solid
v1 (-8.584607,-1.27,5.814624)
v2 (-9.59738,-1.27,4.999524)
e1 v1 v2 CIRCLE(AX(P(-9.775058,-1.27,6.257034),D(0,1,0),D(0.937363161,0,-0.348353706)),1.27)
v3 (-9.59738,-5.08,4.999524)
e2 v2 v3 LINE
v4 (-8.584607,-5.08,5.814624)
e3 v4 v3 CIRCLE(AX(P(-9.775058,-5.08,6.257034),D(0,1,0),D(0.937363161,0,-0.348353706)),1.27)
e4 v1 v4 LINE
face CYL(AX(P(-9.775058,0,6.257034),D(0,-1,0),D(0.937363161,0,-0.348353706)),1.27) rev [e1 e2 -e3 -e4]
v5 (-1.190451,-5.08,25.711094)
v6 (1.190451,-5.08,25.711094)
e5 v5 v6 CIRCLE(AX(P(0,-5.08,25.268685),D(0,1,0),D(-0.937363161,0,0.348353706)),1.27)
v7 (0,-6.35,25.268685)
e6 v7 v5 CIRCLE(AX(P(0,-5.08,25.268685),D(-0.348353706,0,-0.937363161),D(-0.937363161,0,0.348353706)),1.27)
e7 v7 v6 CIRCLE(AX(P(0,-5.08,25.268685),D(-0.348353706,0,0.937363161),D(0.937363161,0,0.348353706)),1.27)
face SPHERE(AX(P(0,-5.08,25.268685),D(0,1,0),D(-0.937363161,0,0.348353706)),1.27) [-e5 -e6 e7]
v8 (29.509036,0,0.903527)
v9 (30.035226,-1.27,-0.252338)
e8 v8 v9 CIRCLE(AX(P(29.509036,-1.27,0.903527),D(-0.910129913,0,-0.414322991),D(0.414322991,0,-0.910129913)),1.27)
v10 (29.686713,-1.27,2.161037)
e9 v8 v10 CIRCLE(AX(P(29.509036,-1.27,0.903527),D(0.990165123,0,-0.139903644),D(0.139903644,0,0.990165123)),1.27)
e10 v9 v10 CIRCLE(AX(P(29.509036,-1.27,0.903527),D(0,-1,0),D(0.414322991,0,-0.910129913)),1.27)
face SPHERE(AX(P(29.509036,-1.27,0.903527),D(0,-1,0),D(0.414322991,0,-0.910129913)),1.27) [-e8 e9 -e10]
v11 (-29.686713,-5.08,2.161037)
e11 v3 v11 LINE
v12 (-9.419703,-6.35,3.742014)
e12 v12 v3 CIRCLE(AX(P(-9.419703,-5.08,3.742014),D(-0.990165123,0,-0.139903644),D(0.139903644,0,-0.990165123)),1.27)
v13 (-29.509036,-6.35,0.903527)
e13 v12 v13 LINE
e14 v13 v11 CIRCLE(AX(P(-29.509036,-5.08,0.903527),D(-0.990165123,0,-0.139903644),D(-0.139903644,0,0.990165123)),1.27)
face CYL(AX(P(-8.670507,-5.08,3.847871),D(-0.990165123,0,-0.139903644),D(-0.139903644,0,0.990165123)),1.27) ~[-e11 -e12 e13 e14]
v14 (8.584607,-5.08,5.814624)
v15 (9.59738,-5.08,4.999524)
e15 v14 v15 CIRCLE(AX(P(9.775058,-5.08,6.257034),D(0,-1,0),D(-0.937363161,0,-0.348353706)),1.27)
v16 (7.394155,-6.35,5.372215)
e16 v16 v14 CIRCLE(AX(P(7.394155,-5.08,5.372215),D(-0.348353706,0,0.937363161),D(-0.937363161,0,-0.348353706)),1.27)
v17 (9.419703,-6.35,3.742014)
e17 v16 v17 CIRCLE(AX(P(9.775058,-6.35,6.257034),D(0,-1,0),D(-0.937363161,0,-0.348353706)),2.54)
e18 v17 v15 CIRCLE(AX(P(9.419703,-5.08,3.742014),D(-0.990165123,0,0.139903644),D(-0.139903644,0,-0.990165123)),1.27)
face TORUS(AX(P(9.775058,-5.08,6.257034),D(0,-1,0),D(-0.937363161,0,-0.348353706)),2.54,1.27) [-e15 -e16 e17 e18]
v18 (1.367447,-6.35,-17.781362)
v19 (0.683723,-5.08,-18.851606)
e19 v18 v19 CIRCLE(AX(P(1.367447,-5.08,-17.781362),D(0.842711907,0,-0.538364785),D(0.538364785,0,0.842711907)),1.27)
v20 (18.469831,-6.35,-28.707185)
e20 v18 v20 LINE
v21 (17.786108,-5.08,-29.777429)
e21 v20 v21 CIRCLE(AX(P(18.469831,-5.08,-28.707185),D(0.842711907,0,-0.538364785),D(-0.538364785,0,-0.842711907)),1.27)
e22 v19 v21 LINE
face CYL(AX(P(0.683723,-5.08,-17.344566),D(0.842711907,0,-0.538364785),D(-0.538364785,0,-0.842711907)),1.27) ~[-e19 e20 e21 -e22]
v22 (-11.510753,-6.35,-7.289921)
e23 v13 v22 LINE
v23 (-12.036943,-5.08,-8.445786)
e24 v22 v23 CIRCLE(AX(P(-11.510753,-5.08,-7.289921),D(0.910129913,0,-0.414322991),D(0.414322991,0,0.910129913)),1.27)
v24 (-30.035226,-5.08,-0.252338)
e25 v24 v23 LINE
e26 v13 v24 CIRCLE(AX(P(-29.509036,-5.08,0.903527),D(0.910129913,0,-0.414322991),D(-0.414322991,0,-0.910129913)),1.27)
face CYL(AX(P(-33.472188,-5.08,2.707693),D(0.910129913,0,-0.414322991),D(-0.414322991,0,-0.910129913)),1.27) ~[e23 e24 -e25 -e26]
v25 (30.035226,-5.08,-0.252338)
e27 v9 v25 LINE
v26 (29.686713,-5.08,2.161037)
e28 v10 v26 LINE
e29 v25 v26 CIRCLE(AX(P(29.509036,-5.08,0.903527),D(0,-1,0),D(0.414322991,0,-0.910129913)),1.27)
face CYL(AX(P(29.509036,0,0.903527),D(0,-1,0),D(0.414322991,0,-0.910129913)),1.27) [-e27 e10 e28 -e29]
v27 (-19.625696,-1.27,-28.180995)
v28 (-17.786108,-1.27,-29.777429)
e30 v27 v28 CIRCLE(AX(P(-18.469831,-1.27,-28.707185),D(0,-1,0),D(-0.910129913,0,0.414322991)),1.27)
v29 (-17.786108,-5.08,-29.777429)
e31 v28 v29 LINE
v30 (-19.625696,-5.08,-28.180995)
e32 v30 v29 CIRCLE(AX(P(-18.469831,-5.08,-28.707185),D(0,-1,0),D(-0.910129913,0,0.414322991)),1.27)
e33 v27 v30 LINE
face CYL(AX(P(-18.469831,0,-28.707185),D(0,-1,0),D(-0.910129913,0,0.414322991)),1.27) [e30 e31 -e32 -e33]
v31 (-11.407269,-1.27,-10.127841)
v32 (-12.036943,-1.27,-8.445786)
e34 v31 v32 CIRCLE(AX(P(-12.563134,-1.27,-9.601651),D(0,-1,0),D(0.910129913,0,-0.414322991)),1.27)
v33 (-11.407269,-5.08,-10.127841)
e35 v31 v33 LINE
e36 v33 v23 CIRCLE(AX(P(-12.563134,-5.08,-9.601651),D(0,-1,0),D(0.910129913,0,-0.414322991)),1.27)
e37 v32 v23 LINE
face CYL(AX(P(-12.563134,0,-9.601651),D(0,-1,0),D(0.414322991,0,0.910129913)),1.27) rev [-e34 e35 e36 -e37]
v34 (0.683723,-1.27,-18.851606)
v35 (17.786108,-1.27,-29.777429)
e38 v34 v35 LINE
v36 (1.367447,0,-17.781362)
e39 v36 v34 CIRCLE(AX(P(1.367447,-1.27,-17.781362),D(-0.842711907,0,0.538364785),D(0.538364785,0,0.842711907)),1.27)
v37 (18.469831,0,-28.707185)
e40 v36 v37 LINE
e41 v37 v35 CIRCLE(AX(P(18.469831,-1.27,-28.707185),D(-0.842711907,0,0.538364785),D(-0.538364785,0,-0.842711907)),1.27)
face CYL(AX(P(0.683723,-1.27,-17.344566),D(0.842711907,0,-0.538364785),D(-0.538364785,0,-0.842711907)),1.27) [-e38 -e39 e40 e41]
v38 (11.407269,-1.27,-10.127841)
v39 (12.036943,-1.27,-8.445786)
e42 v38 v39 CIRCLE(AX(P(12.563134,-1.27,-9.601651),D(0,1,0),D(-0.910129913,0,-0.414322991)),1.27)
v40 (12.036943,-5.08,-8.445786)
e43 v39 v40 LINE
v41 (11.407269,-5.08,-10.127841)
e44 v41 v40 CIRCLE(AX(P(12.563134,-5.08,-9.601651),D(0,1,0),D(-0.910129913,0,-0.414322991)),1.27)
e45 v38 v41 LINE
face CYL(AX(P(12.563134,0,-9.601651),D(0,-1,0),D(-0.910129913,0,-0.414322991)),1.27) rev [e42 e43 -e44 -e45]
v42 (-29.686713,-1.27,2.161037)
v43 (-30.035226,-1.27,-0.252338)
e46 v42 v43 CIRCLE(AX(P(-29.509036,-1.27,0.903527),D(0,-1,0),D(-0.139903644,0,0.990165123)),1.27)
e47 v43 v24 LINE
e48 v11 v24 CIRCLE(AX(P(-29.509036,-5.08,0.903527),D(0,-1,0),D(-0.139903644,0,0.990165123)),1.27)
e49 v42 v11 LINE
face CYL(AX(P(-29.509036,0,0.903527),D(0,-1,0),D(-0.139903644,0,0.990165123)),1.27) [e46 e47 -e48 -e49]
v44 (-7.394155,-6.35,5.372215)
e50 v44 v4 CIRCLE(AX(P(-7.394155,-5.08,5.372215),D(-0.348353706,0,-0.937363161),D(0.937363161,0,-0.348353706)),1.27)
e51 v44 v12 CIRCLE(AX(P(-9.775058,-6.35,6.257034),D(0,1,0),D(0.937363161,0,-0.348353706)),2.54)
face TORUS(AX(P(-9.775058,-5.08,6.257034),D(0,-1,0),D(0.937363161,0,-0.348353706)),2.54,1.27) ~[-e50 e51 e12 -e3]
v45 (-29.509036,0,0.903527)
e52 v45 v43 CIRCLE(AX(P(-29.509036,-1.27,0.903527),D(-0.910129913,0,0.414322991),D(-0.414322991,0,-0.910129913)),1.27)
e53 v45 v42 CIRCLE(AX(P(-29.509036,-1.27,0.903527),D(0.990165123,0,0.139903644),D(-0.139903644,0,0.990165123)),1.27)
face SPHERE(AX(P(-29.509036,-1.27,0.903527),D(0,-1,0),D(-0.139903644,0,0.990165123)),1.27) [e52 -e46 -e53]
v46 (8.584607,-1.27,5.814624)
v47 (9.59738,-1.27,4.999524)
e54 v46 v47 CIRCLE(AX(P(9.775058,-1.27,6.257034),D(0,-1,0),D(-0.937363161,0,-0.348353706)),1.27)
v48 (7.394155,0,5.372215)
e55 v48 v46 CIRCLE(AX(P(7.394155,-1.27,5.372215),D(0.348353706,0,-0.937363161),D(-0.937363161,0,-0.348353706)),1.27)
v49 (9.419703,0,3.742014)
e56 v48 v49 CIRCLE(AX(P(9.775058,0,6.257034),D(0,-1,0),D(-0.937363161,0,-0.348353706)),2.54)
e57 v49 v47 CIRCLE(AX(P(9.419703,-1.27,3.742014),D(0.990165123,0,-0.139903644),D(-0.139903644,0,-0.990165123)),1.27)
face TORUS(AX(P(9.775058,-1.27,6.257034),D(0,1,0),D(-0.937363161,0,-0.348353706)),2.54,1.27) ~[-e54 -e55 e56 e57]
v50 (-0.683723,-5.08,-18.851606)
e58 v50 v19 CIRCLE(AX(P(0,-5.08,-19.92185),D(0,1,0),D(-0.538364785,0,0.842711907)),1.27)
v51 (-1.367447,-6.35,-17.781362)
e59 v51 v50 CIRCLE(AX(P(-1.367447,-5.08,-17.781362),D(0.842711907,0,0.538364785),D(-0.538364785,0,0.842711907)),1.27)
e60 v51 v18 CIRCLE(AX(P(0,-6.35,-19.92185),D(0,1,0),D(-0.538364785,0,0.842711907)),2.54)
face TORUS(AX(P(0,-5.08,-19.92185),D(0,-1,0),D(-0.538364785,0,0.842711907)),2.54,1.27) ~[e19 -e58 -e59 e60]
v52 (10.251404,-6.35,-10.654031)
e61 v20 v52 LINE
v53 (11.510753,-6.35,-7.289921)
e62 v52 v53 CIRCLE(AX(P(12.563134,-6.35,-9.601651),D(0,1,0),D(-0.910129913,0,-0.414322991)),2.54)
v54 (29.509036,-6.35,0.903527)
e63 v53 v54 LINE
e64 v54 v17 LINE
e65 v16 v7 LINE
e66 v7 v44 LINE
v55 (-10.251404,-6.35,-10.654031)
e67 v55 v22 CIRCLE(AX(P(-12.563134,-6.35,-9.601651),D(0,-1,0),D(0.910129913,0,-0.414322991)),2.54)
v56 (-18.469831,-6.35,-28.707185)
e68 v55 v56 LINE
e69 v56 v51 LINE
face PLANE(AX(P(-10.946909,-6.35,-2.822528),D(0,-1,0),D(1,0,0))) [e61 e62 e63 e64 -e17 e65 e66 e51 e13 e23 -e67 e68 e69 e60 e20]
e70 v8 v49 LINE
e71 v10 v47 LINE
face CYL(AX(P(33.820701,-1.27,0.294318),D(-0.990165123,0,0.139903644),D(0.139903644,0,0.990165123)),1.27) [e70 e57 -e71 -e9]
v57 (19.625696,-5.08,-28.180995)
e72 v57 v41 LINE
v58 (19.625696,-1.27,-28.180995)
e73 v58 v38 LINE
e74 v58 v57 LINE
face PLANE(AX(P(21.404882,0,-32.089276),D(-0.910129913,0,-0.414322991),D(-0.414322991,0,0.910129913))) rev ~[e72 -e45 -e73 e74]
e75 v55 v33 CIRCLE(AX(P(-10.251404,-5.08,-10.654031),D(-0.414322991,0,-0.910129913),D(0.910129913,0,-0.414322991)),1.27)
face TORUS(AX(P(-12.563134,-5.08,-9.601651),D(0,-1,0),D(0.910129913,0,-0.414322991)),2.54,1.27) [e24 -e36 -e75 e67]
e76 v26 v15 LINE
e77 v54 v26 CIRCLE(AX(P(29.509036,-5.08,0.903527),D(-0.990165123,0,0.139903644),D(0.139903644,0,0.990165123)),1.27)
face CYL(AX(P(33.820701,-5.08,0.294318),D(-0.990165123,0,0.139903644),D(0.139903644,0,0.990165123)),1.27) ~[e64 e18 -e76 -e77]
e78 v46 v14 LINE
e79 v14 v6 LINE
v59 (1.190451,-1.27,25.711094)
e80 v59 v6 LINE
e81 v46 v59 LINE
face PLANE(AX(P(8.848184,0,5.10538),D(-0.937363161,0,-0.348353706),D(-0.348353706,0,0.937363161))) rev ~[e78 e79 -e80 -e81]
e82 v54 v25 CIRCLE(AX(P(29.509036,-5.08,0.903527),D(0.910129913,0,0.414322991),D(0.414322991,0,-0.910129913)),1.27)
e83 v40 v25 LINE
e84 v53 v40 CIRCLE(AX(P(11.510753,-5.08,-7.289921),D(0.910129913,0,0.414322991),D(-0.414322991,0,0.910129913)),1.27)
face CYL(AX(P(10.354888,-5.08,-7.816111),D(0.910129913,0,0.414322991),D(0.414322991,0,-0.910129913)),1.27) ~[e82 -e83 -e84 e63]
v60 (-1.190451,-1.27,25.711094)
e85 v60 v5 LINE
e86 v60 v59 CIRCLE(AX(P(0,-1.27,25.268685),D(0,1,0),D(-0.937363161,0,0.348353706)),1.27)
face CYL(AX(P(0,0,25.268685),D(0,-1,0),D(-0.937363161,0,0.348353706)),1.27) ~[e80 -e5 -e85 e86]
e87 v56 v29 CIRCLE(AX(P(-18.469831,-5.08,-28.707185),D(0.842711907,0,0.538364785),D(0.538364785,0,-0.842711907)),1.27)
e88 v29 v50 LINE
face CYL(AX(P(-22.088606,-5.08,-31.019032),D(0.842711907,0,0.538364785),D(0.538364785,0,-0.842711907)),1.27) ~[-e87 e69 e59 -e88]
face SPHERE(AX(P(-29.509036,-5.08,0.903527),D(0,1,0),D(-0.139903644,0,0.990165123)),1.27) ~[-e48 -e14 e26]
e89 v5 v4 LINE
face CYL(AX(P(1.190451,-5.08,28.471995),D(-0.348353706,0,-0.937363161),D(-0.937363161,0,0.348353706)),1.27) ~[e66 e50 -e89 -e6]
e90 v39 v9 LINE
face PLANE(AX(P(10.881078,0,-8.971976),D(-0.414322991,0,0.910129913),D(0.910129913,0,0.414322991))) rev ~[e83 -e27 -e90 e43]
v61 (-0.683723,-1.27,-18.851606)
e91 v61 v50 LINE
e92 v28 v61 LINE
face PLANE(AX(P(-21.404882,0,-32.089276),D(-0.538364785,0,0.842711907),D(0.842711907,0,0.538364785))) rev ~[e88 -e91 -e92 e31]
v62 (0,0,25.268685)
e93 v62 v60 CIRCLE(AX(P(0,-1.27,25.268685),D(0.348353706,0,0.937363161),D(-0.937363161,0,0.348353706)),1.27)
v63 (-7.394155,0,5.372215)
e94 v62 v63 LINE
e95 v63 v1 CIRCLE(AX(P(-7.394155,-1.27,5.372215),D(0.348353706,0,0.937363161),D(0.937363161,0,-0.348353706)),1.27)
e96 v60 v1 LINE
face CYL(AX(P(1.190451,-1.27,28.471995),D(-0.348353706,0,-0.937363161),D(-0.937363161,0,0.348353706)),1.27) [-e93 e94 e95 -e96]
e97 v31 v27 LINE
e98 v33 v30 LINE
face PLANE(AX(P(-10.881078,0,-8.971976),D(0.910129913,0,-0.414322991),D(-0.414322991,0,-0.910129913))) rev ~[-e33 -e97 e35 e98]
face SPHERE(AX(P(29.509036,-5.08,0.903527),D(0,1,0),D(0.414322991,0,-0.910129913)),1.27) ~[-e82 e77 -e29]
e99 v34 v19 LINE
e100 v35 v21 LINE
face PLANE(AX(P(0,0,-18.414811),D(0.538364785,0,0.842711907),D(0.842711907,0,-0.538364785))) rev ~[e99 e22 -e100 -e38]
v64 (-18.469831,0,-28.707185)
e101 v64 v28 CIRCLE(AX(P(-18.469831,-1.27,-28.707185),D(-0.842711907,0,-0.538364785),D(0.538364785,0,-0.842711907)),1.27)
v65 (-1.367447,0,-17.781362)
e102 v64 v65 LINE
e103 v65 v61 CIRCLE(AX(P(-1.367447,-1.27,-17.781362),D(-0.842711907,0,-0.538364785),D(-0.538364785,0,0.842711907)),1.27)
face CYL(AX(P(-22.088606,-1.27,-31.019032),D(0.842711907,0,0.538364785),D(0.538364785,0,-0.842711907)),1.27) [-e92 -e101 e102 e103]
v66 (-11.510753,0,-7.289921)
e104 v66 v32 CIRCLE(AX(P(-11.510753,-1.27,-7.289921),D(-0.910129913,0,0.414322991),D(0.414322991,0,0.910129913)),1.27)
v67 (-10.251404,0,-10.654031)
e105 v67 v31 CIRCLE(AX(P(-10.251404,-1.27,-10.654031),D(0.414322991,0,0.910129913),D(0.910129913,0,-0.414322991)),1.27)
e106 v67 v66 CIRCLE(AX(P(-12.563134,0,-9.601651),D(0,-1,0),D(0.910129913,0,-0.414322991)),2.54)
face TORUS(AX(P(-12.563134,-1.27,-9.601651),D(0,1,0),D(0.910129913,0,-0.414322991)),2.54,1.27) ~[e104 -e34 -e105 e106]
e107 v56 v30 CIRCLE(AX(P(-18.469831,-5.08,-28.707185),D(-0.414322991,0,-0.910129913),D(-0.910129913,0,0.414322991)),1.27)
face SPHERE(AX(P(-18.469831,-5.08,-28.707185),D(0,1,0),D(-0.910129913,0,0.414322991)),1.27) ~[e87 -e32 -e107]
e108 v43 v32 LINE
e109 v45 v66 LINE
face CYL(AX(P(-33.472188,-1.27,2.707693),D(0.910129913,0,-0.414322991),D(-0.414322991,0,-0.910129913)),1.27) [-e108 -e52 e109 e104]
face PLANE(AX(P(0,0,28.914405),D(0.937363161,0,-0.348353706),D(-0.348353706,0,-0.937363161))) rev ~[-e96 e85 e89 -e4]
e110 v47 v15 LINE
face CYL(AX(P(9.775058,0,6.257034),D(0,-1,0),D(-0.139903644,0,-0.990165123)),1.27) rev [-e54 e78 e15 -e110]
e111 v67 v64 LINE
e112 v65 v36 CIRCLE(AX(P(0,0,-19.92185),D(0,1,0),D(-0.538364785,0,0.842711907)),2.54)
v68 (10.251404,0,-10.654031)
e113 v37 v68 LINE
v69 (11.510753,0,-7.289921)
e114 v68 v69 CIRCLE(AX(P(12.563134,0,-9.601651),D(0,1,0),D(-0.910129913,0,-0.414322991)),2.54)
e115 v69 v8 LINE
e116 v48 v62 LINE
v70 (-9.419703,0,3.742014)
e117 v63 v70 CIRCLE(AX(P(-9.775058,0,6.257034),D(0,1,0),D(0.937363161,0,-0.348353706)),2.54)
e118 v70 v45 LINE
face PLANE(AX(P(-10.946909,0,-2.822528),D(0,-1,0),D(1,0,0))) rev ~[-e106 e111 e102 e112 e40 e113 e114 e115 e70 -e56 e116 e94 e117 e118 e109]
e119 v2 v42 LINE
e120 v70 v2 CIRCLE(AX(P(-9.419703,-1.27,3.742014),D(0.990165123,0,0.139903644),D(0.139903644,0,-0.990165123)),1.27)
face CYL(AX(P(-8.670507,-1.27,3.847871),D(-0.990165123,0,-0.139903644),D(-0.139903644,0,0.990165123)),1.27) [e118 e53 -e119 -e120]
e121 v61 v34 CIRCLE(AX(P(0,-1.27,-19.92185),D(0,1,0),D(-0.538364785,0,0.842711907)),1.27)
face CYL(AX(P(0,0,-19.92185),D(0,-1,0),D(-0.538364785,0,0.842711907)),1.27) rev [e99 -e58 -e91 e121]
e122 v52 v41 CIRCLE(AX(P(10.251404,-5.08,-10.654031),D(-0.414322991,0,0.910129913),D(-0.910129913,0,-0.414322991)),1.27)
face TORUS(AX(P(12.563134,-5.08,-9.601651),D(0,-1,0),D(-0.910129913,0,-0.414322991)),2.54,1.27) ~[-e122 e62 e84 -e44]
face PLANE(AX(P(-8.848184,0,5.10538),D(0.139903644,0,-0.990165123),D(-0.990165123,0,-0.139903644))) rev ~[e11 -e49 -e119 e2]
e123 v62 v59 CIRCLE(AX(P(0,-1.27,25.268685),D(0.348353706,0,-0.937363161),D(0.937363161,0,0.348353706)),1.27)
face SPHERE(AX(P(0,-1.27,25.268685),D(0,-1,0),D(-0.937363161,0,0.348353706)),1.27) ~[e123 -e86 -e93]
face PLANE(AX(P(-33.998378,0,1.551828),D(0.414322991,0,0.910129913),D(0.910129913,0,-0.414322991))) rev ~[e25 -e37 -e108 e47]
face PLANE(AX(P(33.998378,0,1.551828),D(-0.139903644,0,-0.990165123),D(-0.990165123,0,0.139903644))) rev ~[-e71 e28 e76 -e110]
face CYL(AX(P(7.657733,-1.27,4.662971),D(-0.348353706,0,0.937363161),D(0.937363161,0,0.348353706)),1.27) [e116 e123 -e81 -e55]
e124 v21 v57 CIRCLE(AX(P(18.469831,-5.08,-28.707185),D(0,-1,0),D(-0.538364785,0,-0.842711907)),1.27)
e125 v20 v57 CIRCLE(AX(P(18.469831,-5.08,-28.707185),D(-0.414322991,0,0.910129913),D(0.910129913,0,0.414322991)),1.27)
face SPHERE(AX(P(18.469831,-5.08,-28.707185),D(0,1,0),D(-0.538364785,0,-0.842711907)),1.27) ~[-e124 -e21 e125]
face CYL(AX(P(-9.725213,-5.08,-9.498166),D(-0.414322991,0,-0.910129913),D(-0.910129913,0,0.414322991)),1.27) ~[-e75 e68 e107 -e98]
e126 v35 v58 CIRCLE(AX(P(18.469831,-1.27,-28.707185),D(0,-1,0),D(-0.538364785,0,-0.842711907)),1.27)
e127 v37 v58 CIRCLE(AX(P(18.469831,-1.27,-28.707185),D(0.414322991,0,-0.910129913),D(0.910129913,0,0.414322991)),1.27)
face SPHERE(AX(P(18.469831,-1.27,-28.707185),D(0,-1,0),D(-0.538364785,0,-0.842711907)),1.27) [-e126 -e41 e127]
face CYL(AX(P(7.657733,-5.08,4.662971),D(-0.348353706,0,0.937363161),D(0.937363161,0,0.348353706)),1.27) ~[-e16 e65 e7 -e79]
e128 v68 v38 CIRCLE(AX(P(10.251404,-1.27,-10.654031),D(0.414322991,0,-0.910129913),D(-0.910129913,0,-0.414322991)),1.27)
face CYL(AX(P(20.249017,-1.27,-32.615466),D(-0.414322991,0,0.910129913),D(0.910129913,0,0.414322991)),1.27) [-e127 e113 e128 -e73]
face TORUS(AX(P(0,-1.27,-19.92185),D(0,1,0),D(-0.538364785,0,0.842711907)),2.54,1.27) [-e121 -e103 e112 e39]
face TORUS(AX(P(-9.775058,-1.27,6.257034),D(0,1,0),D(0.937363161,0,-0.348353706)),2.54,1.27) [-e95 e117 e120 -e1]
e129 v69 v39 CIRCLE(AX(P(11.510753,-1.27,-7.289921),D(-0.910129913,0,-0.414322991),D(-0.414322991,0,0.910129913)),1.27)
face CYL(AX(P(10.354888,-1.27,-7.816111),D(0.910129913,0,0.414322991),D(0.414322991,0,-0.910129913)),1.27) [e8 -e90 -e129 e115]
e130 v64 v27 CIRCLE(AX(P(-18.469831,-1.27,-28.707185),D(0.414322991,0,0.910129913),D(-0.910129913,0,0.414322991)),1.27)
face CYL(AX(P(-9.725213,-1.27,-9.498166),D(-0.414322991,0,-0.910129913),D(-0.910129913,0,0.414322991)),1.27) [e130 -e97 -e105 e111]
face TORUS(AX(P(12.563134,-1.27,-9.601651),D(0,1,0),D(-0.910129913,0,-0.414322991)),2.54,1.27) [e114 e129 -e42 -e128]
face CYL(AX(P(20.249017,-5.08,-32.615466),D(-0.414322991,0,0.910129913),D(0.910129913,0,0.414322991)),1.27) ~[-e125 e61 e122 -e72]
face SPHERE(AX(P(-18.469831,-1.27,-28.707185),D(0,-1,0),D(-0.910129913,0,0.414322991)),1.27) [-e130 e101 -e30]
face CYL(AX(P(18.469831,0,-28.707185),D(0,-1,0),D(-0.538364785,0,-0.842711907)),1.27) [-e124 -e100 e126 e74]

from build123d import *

# Parameters (mm, degrees)
F1_DEPTH = 6.35
F2_R     = 1.27


with BuildPart() as f1:
    # F0 (on Front) → F1 (new body)
    with BuildSketch(Plane.XZ):
        Polygon((0, 28.9144045194), (-8.8481841409, 5.1053802343), (-33.9983782601, 1.5518276782), (-10.8810784623, -8.9719762946), (-21.404882435, -32.0892760924), (0, -18.4148105473), align=None)
        Polygon((8.8481841409, 5.1053802343), (0, 28.9144045194), (0, -18.4148105473), (21.404882435, -32.0892760924), (10.8810784623, -8.9719762946), (33.9983782601, 1.5518276782), align=None)
    extrude(amount=F1_DEPTH)

    # F2
    f2_edges = [f1.edges().sort_by_distance(p)[0] for p in [
        (-10.702441, 0, -25.252043),
        (-10.702441, -6.35, -25.252043),
        (10.702441, 0, -25.252043),
        (10.702441, -6.35, -25.252043),
        (16.14298, 0, -20.530626),
        (16.14298, -6.35, -20.530626),
        (22.439728, -6.35, -3.710074),
        (22.439728, 0, -3.710074),
        (21.423281, -6.35, 3.328604),
        (21.423281, 0, 3.328604),
        (0, -3.175, 28.914405),
        (-8.848184, -3.175, 5.10538),
        (-4.424092, 0, 17.009892),
        (-4.424092, -6.35, 17.009892),
        (8.848184, -3.175, 5.10538),
        (4.424092, 0, 17.009892),
        (4.424092, -6.35, 17.009892),
        (10.881078, -3.175, -8.971976),
        (33.998378, -3.175, 1.551828),
        (21.404882, -3.175, -32.089276),
        (0, -3.175, -18.414811),
        (-10.881078, -3.175, -8.971976),
        (-21.404882, -3.175, -32.089276),
        (-16.14298, 0, -20.530626),
        (-16.14298, -6.35, -20.530626),
        (-33.998378, -3.175, 1.551828),
        (-21.423281, 0, 3.328604),
        (-21.423281, -6.35, 3.328604),
        (-22.439728, 0, -3.710074),
        (-22.439728, -6.35, -3.710074),
    ]]
    fillet(f2_edges, radius=F2_R)


solid = f1.part
